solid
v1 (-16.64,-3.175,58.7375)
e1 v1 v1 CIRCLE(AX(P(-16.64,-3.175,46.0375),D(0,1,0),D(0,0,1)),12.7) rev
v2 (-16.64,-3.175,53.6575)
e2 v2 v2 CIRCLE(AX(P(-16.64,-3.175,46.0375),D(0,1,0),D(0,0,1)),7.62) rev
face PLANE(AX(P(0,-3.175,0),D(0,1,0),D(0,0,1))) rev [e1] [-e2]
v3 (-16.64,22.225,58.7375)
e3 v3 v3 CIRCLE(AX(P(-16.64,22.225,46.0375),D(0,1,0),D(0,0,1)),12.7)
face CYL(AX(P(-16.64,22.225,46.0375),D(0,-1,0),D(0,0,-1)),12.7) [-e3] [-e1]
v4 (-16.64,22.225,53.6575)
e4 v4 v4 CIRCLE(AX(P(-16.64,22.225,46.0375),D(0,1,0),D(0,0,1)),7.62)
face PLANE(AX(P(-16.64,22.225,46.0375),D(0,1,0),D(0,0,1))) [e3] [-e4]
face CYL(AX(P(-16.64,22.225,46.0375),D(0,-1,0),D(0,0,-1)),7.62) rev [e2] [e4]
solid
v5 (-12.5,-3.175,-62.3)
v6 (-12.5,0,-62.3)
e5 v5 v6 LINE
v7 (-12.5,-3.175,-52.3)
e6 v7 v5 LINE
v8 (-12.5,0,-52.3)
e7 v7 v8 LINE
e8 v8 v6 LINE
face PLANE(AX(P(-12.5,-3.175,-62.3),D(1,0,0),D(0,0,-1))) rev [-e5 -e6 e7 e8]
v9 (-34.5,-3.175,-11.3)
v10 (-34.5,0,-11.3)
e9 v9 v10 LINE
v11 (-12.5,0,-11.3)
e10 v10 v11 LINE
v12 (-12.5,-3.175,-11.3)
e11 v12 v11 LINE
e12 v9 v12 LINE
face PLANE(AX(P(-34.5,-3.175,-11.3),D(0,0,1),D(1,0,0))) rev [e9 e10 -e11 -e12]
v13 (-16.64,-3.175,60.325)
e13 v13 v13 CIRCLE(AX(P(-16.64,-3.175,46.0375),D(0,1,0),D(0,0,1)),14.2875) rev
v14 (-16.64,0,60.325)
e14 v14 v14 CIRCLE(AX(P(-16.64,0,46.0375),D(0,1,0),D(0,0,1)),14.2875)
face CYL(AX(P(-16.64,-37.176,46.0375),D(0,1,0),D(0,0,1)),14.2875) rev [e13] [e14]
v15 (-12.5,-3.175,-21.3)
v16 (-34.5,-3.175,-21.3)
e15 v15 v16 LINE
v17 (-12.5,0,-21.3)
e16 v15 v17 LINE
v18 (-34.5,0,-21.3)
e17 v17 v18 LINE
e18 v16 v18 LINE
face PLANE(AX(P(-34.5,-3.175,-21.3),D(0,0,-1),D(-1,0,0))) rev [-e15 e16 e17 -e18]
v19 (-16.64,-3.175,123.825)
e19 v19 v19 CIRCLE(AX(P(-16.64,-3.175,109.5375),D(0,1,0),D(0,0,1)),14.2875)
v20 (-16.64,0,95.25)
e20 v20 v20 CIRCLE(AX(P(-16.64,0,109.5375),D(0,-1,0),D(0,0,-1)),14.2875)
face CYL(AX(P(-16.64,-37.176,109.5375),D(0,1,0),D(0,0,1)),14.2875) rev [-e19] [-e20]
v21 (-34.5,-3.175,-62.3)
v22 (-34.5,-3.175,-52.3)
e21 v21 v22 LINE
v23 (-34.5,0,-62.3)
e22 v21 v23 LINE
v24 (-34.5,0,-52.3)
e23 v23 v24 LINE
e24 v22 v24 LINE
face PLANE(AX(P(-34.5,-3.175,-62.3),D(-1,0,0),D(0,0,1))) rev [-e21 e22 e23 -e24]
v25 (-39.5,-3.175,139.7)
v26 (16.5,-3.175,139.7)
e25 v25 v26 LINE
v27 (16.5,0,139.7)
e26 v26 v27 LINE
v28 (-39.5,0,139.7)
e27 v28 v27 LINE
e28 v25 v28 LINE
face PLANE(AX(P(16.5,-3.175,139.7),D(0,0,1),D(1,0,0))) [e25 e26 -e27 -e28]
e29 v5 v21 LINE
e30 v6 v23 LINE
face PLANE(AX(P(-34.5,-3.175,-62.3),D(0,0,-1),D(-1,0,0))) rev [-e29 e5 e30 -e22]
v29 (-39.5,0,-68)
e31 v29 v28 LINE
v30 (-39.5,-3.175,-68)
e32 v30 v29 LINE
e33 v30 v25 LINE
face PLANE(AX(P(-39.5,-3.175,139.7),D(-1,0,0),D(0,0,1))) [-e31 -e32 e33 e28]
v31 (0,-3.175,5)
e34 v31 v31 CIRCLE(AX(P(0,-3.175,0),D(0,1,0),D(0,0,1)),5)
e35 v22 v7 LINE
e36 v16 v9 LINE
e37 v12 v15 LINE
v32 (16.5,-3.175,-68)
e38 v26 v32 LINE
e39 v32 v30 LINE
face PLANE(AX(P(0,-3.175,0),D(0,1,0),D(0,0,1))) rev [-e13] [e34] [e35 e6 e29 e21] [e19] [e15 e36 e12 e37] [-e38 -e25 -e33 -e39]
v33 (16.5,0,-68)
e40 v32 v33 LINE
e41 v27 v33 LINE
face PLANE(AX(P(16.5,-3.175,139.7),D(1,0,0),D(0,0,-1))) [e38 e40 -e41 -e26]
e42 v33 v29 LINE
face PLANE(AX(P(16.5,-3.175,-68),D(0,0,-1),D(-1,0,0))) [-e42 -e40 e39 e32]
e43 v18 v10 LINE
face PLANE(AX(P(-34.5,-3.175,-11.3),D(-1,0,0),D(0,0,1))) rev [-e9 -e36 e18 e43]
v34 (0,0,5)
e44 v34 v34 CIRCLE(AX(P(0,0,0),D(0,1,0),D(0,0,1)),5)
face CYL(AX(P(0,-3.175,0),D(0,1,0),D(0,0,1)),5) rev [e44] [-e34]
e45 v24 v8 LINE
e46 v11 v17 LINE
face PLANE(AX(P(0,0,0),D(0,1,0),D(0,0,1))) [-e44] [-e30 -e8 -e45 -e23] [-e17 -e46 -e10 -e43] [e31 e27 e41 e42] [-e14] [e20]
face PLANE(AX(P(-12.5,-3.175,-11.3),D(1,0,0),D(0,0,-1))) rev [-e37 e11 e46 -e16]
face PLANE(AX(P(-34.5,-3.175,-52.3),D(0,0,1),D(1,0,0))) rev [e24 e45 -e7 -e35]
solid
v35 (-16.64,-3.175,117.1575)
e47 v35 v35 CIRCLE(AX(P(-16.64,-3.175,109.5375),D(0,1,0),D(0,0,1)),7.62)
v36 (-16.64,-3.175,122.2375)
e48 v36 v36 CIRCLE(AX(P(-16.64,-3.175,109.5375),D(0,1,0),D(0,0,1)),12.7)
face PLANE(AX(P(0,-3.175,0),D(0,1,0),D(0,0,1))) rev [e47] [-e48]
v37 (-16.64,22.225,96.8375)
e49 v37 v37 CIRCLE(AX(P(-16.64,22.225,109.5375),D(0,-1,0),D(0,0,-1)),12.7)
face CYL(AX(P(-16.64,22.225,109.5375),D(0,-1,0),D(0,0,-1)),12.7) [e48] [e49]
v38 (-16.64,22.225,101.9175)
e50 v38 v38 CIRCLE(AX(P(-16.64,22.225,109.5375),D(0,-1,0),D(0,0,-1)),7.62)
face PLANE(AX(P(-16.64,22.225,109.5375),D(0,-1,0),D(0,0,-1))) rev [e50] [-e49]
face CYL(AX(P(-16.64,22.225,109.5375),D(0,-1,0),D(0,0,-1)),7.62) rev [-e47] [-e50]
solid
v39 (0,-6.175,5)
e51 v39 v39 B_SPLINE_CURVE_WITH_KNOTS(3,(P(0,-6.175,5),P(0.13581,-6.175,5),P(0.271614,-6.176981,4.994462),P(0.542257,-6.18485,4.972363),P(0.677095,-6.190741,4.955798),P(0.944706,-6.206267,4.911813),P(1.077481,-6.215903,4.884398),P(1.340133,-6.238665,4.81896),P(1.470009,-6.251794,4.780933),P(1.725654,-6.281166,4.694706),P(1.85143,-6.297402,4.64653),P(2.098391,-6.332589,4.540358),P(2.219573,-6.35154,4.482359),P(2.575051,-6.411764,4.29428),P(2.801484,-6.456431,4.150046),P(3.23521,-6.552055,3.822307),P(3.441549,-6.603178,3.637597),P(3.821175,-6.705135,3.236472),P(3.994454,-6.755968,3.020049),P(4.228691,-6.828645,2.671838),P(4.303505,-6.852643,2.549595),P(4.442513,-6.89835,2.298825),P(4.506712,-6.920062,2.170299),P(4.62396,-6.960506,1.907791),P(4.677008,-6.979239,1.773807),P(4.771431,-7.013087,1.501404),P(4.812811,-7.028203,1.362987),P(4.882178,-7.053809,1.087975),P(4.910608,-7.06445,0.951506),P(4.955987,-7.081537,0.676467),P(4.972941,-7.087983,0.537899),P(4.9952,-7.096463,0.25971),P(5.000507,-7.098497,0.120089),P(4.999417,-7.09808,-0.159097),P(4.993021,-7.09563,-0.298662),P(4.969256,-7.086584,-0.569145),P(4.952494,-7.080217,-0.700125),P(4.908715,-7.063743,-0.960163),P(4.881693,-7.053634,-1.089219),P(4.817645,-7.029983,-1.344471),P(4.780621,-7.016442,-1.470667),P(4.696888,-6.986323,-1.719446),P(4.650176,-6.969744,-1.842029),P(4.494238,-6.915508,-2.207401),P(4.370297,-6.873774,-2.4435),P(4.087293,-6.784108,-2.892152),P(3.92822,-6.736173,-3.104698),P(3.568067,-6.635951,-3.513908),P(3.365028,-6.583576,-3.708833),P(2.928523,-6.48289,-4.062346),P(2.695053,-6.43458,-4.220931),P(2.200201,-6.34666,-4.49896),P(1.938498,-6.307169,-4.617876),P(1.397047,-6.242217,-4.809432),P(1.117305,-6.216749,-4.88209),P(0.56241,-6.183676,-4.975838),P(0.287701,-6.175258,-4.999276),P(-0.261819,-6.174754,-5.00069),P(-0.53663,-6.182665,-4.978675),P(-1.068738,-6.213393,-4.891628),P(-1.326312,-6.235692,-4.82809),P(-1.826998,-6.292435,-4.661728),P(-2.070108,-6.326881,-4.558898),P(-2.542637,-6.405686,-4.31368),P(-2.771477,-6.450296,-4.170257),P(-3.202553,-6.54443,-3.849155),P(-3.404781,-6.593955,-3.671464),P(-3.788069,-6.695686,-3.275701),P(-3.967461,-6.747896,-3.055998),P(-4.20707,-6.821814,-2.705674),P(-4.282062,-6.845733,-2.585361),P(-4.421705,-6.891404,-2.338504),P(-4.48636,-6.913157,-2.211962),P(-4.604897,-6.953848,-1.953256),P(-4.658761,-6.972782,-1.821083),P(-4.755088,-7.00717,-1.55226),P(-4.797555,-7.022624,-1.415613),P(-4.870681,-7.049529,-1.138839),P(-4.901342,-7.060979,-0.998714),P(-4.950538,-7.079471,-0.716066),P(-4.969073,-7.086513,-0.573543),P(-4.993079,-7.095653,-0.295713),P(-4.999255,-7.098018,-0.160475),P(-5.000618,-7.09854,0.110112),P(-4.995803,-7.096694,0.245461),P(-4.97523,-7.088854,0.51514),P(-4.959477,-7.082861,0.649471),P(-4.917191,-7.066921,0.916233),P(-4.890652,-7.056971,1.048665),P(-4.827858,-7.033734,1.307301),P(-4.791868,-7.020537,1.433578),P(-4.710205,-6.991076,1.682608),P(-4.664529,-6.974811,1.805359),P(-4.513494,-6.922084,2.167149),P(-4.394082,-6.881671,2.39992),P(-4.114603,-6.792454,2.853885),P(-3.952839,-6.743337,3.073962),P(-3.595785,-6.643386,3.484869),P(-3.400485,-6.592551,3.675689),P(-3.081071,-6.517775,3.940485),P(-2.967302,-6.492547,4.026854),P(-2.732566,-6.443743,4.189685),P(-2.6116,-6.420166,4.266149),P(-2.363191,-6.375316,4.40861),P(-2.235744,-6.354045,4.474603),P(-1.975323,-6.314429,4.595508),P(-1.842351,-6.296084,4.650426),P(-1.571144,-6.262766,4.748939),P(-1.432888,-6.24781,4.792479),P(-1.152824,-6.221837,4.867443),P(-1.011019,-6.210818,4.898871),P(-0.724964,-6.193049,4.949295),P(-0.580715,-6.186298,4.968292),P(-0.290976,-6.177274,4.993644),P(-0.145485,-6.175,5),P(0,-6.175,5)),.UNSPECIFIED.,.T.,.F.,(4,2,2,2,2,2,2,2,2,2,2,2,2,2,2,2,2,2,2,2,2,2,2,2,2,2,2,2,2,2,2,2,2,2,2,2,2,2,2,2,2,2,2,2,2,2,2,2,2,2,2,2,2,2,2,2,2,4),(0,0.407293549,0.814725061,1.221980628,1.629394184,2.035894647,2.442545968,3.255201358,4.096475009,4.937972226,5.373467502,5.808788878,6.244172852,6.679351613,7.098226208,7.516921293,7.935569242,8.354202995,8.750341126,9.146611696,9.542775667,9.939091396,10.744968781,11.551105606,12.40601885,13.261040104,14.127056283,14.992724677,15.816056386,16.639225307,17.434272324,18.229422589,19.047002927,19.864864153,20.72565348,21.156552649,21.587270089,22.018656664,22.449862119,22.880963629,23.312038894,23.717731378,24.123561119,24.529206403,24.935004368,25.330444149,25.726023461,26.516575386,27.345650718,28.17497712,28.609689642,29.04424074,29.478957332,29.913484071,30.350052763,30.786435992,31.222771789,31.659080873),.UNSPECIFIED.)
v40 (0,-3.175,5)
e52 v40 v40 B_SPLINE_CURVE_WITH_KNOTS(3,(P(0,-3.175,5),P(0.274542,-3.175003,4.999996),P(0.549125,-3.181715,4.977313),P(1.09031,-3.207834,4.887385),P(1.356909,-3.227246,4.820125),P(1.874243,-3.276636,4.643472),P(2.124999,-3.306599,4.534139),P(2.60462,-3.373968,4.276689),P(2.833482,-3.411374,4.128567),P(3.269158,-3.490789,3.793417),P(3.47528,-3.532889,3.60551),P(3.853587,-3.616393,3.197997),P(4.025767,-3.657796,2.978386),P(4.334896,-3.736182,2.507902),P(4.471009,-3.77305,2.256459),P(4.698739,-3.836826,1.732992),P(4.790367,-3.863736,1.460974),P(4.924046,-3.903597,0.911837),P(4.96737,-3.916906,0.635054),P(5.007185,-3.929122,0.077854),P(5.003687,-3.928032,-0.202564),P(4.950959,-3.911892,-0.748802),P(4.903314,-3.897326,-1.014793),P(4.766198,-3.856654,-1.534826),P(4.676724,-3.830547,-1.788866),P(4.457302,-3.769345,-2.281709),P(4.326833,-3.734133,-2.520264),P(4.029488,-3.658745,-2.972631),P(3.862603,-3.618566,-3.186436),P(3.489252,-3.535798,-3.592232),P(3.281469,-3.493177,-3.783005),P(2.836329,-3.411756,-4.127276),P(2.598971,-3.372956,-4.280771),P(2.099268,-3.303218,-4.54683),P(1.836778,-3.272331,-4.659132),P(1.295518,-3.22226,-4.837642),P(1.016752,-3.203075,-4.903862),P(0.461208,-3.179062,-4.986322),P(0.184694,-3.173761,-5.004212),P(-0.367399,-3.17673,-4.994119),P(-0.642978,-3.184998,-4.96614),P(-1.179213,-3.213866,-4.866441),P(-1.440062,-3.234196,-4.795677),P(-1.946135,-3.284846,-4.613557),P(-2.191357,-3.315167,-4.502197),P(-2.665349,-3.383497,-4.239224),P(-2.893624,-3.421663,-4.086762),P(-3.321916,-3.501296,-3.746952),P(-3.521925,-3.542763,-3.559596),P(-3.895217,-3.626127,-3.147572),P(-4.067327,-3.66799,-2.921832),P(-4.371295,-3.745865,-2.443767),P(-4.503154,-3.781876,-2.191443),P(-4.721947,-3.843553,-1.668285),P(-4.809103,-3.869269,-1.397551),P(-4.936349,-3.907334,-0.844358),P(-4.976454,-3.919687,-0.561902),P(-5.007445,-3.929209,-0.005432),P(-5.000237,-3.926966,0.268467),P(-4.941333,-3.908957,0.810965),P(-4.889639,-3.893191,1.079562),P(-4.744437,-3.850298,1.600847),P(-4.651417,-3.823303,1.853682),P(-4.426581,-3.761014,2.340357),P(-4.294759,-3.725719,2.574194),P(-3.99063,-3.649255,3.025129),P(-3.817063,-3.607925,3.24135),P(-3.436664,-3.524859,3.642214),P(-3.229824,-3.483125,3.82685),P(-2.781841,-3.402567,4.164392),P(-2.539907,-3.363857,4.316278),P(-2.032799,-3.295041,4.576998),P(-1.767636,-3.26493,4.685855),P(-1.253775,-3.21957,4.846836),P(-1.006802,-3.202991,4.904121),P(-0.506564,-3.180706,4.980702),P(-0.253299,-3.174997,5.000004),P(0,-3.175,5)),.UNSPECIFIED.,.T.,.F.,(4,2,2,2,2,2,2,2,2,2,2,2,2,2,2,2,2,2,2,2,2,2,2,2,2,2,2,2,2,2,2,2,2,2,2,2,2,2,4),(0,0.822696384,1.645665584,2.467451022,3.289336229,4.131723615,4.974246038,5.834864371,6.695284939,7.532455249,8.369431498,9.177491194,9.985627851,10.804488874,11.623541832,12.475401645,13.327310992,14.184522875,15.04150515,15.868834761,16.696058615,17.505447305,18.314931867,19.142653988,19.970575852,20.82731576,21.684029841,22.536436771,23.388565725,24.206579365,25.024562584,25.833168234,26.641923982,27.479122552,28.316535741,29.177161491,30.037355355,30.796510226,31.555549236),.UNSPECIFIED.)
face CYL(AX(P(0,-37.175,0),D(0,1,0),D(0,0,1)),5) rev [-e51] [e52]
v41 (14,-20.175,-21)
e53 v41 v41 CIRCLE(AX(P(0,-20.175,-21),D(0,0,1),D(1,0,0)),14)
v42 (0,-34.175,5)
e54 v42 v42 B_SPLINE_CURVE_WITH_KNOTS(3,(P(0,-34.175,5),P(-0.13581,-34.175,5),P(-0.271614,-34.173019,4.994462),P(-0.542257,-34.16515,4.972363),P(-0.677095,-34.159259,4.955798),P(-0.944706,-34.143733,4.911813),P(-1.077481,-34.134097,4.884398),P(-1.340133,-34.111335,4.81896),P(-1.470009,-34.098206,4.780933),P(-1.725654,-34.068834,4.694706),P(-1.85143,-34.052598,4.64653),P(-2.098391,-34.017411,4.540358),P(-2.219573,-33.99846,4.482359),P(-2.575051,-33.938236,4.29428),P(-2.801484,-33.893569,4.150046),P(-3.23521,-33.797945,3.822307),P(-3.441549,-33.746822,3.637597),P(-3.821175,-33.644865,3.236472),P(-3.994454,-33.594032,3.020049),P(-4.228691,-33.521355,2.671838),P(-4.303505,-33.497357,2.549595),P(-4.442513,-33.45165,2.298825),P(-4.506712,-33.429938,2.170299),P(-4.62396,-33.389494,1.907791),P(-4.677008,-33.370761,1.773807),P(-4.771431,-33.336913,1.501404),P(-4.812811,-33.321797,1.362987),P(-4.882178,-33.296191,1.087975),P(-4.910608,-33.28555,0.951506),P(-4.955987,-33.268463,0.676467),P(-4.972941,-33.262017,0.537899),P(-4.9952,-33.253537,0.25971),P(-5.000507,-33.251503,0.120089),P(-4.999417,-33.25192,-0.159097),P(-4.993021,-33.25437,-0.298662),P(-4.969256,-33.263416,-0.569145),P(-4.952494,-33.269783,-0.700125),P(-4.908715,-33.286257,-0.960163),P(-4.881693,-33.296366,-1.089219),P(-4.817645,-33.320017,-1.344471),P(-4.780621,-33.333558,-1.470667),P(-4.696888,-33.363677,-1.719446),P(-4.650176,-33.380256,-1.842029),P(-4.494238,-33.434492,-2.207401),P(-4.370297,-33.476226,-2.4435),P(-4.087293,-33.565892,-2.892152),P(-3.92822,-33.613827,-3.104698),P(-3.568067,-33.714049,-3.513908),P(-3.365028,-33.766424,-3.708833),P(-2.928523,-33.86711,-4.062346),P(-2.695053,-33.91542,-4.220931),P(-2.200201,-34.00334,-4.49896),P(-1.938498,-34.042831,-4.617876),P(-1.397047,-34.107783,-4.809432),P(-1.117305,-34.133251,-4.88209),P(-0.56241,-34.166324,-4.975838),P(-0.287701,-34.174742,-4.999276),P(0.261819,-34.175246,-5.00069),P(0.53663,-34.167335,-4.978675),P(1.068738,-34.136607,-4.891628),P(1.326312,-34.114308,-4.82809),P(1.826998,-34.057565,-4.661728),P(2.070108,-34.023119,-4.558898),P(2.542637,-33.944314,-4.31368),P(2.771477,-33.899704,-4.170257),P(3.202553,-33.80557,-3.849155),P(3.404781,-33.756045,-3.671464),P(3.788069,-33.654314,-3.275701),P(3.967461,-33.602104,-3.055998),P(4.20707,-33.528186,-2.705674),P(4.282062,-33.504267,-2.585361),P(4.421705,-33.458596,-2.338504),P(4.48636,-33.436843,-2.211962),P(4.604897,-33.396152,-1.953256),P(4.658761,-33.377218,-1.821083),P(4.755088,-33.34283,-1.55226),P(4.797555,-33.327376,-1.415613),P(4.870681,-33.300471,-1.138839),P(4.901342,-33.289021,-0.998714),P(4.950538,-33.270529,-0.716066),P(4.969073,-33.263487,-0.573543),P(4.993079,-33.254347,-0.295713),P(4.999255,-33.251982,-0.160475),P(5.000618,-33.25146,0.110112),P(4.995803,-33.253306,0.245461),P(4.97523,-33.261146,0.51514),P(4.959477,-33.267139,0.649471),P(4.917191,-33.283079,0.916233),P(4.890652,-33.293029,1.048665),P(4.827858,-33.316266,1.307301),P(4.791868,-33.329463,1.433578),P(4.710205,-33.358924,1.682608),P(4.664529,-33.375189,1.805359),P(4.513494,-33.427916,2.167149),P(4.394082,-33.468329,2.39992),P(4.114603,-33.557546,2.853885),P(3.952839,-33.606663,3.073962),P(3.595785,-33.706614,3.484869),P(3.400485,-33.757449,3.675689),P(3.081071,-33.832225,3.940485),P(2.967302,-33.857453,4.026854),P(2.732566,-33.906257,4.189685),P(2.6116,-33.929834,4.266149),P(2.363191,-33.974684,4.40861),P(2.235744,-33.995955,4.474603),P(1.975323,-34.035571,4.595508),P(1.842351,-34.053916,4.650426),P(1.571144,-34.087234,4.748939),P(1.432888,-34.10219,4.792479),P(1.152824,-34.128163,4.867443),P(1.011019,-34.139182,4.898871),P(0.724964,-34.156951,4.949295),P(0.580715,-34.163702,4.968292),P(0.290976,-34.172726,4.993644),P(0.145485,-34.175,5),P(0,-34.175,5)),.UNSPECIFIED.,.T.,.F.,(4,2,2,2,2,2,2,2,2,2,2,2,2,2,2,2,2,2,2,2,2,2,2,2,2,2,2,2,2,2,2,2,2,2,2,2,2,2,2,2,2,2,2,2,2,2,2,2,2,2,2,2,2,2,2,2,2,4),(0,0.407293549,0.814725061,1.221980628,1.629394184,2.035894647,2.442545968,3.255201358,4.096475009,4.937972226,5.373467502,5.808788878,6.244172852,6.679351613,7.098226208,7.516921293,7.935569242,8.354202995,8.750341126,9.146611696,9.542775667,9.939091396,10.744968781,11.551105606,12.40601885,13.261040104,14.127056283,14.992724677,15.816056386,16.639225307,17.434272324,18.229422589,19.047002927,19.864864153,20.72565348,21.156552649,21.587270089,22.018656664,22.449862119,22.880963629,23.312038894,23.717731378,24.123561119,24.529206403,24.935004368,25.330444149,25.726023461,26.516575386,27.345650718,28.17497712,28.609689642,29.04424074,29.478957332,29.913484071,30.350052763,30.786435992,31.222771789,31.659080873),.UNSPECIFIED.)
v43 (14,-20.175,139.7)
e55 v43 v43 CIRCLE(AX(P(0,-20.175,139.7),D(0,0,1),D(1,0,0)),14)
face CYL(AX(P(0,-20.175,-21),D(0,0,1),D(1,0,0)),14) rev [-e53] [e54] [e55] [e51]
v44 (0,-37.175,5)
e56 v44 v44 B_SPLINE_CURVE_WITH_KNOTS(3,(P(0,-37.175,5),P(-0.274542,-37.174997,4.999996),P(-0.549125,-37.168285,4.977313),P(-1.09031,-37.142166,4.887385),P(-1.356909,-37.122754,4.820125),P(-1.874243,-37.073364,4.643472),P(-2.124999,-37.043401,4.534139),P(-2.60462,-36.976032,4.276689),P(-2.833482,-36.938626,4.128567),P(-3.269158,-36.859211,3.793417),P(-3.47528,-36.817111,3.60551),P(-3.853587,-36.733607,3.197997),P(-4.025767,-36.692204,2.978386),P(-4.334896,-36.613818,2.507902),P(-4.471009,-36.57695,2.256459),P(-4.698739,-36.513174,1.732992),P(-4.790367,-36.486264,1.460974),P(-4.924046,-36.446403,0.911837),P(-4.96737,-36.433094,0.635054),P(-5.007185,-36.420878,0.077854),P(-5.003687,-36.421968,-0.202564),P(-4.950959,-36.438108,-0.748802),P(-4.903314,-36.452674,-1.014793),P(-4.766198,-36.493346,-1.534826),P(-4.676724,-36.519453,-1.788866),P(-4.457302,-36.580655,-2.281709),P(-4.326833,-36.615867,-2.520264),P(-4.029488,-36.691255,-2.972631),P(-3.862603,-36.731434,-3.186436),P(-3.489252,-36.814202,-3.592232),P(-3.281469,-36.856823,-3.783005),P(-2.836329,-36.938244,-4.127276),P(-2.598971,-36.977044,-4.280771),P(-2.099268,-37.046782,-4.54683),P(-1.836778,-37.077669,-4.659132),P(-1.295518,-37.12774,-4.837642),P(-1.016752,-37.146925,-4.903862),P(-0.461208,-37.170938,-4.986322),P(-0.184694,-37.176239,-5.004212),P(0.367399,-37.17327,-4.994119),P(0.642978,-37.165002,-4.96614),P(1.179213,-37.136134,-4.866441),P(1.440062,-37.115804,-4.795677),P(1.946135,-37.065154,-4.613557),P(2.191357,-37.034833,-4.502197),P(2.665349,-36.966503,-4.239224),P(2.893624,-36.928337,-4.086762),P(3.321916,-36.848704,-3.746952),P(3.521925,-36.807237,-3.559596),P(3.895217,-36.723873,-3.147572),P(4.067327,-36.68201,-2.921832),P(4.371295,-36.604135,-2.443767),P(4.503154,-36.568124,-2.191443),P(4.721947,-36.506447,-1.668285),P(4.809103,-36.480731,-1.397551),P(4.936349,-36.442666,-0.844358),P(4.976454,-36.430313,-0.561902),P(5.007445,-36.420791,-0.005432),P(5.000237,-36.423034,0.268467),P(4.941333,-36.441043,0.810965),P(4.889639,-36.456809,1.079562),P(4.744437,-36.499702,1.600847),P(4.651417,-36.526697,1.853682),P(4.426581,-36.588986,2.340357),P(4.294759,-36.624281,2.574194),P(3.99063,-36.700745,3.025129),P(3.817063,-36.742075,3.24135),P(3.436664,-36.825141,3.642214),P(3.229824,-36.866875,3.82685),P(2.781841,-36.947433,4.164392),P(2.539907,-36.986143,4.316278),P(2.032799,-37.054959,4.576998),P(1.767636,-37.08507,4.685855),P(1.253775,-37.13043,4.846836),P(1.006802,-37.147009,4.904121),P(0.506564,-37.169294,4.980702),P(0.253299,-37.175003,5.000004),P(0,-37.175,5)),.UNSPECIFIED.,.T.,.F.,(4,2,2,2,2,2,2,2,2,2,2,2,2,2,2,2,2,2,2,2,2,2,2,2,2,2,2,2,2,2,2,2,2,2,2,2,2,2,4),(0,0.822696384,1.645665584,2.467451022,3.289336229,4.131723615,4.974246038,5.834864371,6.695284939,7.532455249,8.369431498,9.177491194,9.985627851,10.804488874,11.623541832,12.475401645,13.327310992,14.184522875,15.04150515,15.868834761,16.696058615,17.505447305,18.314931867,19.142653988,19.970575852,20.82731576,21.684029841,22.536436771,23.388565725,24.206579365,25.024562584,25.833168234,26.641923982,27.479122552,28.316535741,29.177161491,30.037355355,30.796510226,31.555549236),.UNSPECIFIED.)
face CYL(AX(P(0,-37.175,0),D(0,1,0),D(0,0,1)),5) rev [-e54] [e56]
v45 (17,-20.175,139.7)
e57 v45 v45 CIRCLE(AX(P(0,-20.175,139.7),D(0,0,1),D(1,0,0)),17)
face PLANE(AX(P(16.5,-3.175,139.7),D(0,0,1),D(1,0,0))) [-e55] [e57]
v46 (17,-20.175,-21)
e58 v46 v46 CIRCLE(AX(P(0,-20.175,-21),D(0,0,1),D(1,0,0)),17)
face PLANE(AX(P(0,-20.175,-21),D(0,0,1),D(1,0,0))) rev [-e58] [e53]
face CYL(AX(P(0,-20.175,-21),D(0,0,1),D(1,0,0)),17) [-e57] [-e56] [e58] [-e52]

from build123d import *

# Parameters (mm, degrees)
SKETCH1_W                  = 56
SKETCH1_H                  = 207.7
SKETCH1_R                  = 5
SKETCH1_W_2                = 22
SKETCH1_H_2                = 10
BASE_FLANGE1_DEPTH         = 3.175
BOSS_EXTRUDE2_DEPTH        = 139.7
BOSS_EXTRUDE2_DEPTH_BACK   = 21
SKETCH7_R                  = 17
SKETCH7_R_2                = 14
SKETCH8_R                  = 5
CUT_EXTRUDE1_DEPTH         = 150.861004351
SKETCH6_R                  = 14.2875
CUT_EXTRUDE2_DEPTH         = 3.175
BOSS_EXTRUDE3_DEPTH        = 22.225
BOSS_EXTRUDE3_DEPTH_BACK   = 3.175
SKETCH6_4_R                = 12.7
SKETCH6_4_R_2              = 7.62
BOSS_EXTRUDE3_2_DEPTH      = 22.225
BOSS_EXTRUDE3_2_DEPTH_BACK = 3.175


# Sheet-metal steps are written as plain solids
with BuildPart() as part:
    # Sketch1 → Base-Flange1 (new body)
    with BuildSketch(Plane(origin=(0, 0, 0), x_dir=(1, 0, 0), z_dir=(0, 1, 0))):
        with Locations((-11.5, -35.85)):
            Rectangle(SKETCH1_W, SKETCH1_H)
        with Locations(Location((0, 0, 0), (0, 0, 270))):
            Circle(SKETCH1_R, mode=Mode.SUBTRACT)
        with Locations((-23.5, 57.3)):
            Rectangle(SKETCH1_W_2, SKETCH1_H_2, mode=Mode.SUBTRACT)
        with Locations((-23.5, 16.3)):
            Rectangle(SKETCH1_W_2, SKETCH1_H_2, mode=Mode.SUBTRACT)
    extrude(amount=-BASE_FLANGE1_DEPTH)

    # Sketch6 → Cut-Extrude2 (cut)
    with BuildSketch(Plane(origin=(0, 0, 0), x_dir=(1, 0, 0), z_dir=(0, 1, 0))):
        with Locations(Location((-16.64, -46.0375, 0), (0, 0, 270))):
            Circle(SKETCH6_R)
        with Locations(Location((-16.64, -109.5375, 0), (0, 0, 270))):
            Circle(SKETCH6_R)
    extrude(amount=-CUT_EXTRUDE2_DEPTH, mode=Mode.SUBTRACT)


with BuildPart() as body_2:
    # Sketch7 → Boss-Extrude2 (new, two sides: drawn at the far end of the back side and taken through both)
    with BuildSketch(Plane.XY.offset(-BOSS_EXTRUDE2_DEPTH_BACK)):
        with Locations((0, -20.175)):
            Circle(SKETCH7_R)
        with Locations((0, -20.175)):
            Circle(SKETCH7_R_2, mode=Mode.SUBTRACT)
    extrude(amount=BOSS_EXTRUDE2_DEPTH + BOSS_EXTRUDE2_DEPTH_BACK)

    # Sketch8 → Cut-Extrude1 (cut, through all)
    with BuildSketch(Plane(origin=(0, 0, 0), x_dir=(1, 0, 0), z_dir=(0, 1, 0))):
        with Locations(Location((0, 0, 0), (0, 0, 270))):
            Circle(SKETCH8_R)
    extrude(amount=-CUT_EXTRUDE1_DEPTH, mode=Mode.SUBTRACT)


with BuildPart() as body_3:
    # Sketch6<4> → Boss-Extrude3 (new, two sides: drawn at the far end of the back side and taken through both)
    with BuildSketch(Plane(origin=(0, 0, 0), x_dir=(1, 0, 0), z_dir=(0, 1, 0)).offset(-BOSS_EXTRUDE3_DEPTH_BACK)):
        with Locations(Location((-16.64, -46.0375, 0), (0, 0, 270))):
            Circle(SKETCH6_4_R)
        with Locations(Location((-16.64, -46.0375, 0), (0, 0, 270))):
            Circle(SKETCH6_4_R_2, mode=Mode.SUBTRACT)
    extrude(amount=BOSS_EXTRUDE3_DEPTH + BOSS_EXTRUDE3_DEPTH_BACK)


with BuildPart() as body_4:
    # Sketch6<4> → Boss-Extrude3 2 (new, two sides: drawn at the far end of the back side and taken through both)
    with BuildSketch(Plane(origin=(0, 0, 0), x_dir=(1, 0, 0), z_dir=(0, 1, 0)).offset(-BOSS_EXTRUDE3_2_DEPTH_BACK)):
        with Locations(Location((-16.64, -109.5375, 0), (0, 0, 90))):
            Circle(SKETCH6_4_R)
        with Locations(Location((-16.64, -109.5375, 0), (0, 0, 90))):
            Circle(SKETCH6_4_R_2, mode=Mode.SUBTRACT)
    extrude(amount=BOSS_EXTRUDE3_2_DEPTH + BOSS_EXTRUDE3_2_DEPTH_BACK)


solid = Compound([part.part, body_2.part, body_3.part, body_4.part])
